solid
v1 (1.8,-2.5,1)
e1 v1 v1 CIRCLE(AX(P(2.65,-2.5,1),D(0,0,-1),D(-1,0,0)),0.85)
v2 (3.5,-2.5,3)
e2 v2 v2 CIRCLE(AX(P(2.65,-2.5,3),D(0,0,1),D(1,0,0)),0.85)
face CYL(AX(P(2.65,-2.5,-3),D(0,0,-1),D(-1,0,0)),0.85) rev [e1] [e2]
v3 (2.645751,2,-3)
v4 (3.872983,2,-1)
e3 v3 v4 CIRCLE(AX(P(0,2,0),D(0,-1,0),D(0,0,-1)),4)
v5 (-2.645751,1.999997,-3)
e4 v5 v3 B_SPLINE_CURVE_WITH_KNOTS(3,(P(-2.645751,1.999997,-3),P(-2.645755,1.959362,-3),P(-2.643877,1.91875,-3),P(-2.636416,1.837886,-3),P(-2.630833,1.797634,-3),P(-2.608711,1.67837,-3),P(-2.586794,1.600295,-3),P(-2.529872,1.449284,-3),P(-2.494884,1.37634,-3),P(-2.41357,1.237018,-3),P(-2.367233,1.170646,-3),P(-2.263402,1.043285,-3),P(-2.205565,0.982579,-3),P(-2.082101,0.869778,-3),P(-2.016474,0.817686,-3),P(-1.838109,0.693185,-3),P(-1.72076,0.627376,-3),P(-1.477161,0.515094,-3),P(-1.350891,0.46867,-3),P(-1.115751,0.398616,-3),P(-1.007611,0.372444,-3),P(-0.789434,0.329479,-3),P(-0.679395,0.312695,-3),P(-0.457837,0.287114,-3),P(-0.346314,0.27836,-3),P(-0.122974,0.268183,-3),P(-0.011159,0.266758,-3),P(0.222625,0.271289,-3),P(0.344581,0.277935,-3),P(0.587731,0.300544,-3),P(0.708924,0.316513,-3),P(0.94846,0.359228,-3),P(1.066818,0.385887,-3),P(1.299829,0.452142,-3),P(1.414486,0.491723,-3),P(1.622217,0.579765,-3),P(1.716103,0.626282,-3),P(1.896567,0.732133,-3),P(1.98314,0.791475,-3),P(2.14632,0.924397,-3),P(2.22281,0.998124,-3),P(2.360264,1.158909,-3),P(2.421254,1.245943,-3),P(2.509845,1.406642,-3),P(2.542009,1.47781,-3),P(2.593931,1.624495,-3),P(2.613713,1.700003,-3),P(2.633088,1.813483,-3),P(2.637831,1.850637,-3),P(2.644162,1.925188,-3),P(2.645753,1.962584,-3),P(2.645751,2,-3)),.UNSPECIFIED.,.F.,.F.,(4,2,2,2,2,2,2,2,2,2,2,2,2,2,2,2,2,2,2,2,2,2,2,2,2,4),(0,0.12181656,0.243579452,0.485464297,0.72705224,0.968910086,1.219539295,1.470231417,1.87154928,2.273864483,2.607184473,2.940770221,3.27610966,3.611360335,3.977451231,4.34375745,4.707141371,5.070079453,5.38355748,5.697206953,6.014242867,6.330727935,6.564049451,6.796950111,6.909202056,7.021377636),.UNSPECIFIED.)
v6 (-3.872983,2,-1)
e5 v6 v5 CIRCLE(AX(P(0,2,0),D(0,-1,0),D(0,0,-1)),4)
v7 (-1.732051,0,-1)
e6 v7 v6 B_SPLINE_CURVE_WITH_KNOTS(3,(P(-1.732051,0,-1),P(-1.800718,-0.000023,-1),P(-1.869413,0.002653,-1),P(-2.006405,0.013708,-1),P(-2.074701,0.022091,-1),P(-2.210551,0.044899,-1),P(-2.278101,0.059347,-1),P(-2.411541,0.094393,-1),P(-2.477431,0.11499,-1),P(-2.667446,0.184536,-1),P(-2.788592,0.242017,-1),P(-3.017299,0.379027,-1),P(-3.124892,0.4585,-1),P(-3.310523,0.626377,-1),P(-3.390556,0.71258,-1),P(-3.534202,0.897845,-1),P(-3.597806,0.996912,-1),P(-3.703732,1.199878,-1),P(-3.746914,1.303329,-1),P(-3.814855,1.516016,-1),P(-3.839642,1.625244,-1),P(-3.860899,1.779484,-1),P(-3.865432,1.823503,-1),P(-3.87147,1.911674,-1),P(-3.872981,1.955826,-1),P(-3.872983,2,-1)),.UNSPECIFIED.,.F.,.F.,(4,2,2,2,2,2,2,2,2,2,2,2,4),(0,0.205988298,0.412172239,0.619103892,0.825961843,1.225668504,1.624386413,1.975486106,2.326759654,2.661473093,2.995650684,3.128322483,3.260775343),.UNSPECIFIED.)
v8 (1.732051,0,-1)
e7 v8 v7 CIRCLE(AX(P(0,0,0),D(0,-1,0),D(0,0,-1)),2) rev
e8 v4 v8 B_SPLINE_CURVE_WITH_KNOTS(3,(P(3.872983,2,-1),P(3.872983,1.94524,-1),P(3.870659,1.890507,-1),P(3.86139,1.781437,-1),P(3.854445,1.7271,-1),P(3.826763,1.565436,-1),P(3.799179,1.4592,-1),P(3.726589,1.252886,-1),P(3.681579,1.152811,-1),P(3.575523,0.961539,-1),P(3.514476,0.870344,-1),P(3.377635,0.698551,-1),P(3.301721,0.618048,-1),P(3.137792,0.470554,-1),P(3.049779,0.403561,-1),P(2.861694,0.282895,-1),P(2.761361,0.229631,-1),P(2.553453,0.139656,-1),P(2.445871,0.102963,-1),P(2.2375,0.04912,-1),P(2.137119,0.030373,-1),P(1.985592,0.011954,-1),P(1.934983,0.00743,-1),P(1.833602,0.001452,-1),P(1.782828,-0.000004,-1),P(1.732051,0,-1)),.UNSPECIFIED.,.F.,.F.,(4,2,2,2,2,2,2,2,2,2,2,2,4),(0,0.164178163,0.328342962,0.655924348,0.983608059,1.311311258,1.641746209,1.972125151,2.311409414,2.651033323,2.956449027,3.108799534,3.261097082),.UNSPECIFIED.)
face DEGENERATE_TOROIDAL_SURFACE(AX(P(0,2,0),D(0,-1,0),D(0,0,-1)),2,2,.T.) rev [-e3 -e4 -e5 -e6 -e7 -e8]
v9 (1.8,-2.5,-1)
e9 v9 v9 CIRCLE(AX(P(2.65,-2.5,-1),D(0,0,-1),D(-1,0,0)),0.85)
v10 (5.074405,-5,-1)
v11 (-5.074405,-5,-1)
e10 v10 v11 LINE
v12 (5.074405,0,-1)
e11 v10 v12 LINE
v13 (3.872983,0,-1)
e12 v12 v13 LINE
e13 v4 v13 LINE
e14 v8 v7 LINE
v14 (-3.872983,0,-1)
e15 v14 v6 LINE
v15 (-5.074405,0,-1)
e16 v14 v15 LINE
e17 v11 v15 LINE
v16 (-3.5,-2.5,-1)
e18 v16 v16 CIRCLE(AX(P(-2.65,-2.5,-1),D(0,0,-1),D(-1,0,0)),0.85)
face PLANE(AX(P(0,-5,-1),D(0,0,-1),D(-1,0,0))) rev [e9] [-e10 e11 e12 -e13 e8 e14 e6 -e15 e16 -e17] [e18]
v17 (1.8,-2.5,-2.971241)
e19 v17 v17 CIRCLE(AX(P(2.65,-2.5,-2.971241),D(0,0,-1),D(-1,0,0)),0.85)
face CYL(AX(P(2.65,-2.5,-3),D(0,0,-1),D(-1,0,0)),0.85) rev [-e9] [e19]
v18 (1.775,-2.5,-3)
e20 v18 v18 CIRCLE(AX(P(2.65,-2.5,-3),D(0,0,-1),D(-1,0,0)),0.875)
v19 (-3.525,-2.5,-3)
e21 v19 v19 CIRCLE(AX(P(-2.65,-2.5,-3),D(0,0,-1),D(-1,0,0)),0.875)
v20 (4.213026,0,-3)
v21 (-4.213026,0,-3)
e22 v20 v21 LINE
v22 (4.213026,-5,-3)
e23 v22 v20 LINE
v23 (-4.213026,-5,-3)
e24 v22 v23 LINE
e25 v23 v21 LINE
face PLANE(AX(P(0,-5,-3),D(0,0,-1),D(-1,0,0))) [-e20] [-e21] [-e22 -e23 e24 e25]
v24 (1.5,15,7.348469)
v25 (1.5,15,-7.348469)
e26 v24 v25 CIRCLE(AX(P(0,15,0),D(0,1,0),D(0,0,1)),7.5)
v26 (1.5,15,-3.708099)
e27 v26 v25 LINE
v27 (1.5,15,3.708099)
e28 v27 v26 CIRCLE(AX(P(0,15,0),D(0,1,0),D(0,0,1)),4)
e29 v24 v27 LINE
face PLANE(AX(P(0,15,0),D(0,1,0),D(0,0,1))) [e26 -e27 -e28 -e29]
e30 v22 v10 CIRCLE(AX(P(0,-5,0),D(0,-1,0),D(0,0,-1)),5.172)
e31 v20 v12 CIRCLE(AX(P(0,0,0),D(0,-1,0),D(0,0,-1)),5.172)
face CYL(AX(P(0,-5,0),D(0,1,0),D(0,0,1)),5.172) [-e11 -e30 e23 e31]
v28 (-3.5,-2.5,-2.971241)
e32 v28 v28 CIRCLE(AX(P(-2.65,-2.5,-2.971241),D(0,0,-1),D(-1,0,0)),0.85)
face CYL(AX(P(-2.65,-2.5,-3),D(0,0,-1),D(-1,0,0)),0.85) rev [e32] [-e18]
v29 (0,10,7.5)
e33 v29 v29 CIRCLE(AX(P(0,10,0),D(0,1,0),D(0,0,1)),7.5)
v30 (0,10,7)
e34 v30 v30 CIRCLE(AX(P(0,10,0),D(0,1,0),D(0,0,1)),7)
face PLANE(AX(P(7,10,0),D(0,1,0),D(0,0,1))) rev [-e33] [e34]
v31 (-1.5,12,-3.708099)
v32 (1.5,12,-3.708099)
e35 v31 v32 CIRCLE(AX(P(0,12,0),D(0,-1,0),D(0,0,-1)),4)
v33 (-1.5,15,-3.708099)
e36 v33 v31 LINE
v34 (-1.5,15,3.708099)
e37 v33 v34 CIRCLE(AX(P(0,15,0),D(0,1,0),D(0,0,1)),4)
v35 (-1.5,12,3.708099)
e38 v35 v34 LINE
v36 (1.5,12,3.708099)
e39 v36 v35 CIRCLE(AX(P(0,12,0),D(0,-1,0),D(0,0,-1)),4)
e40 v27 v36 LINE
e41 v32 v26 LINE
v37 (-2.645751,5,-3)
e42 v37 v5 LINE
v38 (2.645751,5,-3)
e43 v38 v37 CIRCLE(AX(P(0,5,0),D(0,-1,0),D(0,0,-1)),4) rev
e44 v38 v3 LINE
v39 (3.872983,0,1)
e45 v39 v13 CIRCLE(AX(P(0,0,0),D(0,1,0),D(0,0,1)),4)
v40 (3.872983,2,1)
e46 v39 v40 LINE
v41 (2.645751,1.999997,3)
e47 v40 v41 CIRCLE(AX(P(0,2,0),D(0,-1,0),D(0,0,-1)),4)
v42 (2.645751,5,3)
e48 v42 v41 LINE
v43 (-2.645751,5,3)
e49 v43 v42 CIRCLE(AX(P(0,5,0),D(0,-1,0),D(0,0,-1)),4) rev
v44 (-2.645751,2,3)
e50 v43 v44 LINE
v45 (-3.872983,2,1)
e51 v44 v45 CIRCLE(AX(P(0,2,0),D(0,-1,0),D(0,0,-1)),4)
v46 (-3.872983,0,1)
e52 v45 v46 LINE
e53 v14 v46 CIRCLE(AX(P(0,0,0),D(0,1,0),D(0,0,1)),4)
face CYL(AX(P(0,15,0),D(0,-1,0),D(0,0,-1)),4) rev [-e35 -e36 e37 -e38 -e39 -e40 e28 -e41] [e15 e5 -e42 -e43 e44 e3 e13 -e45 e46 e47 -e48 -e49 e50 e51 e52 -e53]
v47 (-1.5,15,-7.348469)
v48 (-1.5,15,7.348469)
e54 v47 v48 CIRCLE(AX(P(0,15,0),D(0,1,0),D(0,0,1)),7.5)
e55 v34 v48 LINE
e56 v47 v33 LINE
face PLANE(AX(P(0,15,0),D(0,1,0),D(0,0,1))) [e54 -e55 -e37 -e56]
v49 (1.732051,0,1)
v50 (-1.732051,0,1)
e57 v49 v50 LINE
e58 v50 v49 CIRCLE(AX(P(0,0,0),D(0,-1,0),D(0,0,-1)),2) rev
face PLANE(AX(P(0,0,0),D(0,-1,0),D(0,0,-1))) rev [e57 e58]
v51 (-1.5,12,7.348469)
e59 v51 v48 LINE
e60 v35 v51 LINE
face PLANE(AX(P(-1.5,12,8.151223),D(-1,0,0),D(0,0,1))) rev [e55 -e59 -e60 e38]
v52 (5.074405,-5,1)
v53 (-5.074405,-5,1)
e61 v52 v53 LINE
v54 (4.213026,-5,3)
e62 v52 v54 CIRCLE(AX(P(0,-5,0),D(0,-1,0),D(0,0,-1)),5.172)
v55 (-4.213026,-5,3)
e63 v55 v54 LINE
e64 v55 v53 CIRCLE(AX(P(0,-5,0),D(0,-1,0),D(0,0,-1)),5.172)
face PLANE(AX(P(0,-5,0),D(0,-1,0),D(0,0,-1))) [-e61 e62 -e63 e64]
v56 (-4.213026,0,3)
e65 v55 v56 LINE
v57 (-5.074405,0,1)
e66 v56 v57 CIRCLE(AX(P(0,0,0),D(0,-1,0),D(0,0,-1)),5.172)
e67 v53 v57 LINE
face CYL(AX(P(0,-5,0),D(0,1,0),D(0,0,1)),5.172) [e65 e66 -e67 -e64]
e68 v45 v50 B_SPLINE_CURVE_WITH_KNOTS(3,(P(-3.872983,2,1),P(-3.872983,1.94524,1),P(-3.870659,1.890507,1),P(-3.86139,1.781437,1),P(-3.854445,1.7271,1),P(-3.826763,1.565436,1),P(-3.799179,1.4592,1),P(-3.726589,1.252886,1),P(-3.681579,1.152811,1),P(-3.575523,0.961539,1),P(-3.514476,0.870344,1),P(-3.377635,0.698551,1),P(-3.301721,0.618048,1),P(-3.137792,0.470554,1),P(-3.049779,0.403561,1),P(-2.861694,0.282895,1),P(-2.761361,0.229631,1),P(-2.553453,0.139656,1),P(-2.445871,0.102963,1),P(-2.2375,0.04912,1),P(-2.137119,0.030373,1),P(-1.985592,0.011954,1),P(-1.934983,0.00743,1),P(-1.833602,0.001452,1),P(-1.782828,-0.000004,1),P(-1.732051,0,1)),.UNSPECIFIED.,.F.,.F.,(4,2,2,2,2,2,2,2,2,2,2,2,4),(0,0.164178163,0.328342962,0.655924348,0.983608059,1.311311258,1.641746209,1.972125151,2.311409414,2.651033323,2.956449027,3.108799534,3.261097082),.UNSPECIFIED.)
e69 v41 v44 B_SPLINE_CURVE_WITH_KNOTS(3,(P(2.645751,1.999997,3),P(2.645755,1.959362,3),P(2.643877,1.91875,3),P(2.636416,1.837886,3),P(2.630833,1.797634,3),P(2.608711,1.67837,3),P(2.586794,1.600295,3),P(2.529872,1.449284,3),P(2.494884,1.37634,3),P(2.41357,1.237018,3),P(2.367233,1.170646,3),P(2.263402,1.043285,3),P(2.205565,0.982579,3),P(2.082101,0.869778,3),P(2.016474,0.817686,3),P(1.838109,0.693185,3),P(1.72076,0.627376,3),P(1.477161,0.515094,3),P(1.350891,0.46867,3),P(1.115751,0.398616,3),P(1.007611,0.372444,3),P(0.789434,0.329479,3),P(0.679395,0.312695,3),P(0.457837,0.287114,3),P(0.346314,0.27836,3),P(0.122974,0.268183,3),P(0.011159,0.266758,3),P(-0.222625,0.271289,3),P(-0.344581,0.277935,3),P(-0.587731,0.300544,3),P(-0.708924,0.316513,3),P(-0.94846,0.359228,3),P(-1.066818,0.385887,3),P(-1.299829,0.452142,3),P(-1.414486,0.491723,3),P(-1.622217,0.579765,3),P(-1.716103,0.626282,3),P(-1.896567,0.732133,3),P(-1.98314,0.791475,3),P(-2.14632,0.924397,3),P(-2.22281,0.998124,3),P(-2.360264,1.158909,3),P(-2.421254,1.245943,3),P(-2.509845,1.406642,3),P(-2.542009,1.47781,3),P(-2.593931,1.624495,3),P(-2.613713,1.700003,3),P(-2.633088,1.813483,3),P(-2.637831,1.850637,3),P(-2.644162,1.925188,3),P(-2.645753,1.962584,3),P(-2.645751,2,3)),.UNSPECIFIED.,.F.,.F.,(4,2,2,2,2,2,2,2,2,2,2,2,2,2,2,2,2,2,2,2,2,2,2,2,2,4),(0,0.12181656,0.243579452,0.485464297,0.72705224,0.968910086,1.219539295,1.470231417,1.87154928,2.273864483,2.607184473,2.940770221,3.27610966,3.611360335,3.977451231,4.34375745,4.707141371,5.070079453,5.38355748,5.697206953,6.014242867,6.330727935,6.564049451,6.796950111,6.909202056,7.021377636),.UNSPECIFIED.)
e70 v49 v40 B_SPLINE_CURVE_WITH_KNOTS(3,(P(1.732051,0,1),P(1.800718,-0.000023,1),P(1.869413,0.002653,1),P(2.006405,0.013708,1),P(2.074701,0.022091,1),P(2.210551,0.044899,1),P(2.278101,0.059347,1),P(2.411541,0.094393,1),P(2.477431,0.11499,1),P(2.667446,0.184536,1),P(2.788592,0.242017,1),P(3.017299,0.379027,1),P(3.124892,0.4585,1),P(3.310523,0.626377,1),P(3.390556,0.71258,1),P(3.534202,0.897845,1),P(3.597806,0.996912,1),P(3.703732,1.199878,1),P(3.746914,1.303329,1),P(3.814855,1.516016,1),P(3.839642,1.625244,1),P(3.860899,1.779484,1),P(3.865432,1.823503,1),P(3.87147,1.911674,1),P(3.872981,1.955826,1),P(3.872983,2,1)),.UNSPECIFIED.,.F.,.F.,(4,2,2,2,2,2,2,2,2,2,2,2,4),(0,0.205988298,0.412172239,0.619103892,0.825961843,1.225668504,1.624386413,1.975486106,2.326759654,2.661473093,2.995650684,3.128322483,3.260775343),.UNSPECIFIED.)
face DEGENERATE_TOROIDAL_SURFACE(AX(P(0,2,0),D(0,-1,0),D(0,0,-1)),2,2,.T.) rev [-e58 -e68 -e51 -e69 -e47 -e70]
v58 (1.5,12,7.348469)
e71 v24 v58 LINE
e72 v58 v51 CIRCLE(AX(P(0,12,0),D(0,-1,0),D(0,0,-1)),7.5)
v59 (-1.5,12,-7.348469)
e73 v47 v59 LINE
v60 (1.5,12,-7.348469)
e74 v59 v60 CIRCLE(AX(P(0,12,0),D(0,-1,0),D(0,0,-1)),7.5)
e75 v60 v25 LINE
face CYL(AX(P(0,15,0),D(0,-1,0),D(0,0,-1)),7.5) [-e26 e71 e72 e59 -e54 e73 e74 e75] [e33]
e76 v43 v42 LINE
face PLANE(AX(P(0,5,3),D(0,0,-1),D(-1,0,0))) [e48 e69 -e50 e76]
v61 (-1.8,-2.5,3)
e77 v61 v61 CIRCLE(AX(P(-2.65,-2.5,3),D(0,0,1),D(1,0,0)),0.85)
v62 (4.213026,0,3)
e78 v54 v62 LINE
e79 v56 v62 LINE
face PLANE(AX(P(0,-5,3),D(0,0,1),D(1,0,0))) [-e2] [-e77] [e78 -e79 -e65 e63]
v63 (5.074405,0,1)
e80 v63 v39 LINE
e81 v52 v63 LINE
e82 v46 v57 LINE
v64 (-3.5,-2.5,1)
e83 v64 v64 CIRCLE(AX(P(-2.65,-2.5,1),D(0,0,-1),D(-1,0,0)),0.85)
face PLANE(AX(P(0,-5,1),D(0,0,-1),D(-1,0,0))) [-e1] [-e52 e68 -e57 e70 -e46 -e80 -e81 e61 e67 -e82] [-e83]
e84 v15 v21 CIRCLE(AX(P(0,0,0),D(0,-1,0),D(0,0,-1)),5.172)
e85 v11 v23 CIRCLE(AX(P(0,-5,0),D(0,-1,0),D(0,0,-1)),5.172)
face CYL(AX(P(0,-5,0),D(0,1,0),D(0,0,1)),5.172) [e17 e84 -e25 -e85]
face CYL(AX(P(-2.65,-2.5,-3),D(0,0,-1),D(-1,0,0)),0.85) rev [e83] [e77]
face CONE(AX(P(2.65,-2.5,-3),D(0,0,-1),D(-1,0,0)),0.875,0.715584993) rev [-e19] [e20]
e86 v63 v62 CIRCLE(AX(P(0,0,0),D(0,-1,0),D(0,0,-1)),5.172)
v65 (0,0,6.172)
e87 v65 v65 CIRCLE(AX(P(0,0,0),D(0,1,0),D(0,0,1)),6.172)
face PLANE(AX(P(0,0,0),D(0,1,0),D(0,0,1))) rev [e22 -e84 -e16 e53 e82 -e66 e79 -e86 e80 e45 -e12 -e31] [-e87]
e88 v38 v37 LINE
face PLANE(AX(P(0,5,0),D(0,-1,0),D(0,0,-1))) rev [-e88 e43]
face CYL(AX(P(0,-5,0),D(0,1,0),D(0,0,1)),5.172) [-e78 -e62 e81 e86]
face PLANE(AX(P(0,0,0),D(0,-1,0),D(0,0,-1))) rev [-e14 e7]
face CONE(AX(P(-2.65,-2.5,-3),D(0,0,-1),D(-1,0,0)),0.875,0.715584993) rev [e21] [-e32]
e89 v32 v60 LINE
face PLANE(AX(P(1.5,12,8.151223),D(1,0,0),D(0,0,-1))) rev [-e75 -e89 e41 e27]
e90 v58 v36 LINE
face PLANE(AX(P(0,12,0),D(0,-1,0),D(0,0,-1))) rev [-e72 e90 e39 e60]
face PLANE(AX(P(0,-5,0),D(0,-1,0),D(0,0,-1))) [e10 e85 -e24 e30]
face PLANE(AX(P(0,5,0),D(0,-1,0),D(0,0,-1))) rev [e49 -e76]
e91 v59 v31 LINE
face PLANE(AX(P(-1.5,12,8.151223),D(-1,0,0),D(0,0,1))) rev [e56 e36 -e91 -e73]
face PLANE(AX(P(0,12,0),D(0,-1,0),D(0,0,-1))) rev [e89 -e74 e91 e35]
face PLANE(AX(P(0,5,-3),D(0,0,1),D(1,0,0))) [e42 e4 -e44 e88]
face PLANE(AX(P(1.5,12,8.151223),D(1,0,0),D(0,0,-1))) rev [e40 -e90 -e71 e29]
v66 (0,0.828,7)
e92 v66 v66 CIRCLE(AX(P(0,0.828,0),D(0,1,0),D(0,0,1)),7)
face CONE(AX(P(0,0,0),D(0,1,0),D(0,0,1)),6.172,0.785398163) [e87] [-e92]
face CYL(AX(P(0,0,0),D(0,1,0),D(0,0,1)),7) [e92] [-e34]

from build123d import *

# Parameters (mm, degrees)
CROQUIS1_R                               = 7.5
CROQUIS1_R_2                             = 4
SALIENTE_EXTRUIR1_DEPTH                  = 15
CROQUIS2_W                               = 3
CROQUIS2_H                               = 16.302446726
CORTAR_EXTRUIR1_DEPTH                    = 3
SALIENTE_EXTRUIR2_START                  = 5
SALIENTE_EXTRUIR2_DEPTH                  = 5
TALADRO_DE_MARGEN_PARA_M1_61_D           = 1.7
TALADRO_DE_MARGEN_PARA_M1_61_CSINK_D     = 1.75
TALADRO_DE_MARGEN_PARA_M1_61_CSINK_ANGLE = 82
REDONDEO1_R                              = 2
SALIENTE_EXTRUIR3_DEPTH                  = 5


# Read off the part's stored shape, not the designer's step: M14x1.5 Roscas Standard Taladro1
with BuildPart() as part:
    # Croquis1 → Saliente-Extruir1 (new body)
    with BuildSketch(Plane(origin=(0, 0, 0), x_dir=(1, 0, 0), z_dir=(0, 1, 0))):
        with Locations(Location((0, 0, 0), (0, 0, 270))):
            Circle(CROQUIS1_R)
        with Locations(Location((0, 0, 0), (0, 0, 270))):
            Circle(CROQUIS1_R_2, mode=Mode.SUBTRACT)
    extrude(amount=SALIENTE_EXTRUIR1_DEPTH)

    # Croquis2 → Cortar-Extruir1 (cut)
    with BuildSketch(Plane(origin=(0, 15, 0), x_dir=(1, 0, 0), z_dir=(0, 1, 0))):
        Rectangle(CROQUIS2_W, CROQUIS2_H)
    extrude(amount=-CORTAR_EXTRUIR1_DEPTH, mode=Mode.SUBTRACT)

    # M14x1.5 Roscas Standard Taladro1 outline → M14x1.5 Roscas Standard Taladro1 (revolve, cut)
    with BuildSketch(Plane.XY):
        Polygon((6.172, 0), (7.5, 0), (7.5, 10), (7, 10), (7, 0.828), align=None)
    revolve(axis=Axis((0, 0, 0), (0, 1, 0)), mode=Mode.SUBTRACT)

    # Croquis4 → Saliente-Extruir2 (add)
    with BuildSketch(Plane.XZ.offset(SALIENTE_EXTRUIR2_START)):
        with BuildLine():
            ThreePointArc((2.645751311, -3), (3.409321836, -2.092014488), (3.872983346, -1))
            Line((3.872983346, -1), (-3.872983346, -1))
            ThreePointArc((-3.872983346, -1), (-3.409321836, -2.092014488), (-2.645751311, -3))
            Line((-2.645751311, -3), (2.645751311, -3))
        make_face()
        with BuildLine():
            Line((-3.872983346, 1), (3.872983346, 1))
            ThreePointArc((3.872983346, 1), (3.409321836, 2.092014488), (2.645751311, 3))
            Line((2.645751311, 3), (-2.645751311, 3))
            ThreePointArc((-2.645751311, 3), (-3.409321836, 2.092014488), (-3.872983346, 1))
        make_face()
        with BuildLine():
            Line((3.872983346, 1), (5.074404793, 1))
            ThreePointArc((5.074404793, 1), (4.750167411, 2.045847884), (4.213025516, 3))
            Line((4.213025516, 3), (2.645751311, 3))
            ThreePointArc((2.645751311, 3), (3.409321836, 2.092014488), (3.872983346, 1))
        make_face()
        with BuildLine():
            Line((-5.074404793, 1), (-3.872983346, 1))
            ThreePointArc((-3.872983346, 1), (-3.409321836, 2.092014488), (-2.645751311, 3))
            Line((-2.645751311, 3), (-4.213025516, 3))
            ThreePointArc((-4.213025516, 3), (-4.750167411, 2.045847884), (-5.074404793, 1))
        make_face()
        with BuildLine():
            ThreePointArc((4.213025516, -3), (4.750167411, -2.045847884), (5.074404793, -1))
            Line((5.074404793, -1), (3.872983346, -1))
            ThreePointArc((3.872983346, -1), (3.409321836, -2.092014488), (2.645751311, -3))
            Line((2.645751311, -3), (4.213025516, -3))
        make_face()
        with BuildLine():
            ThreePointArc((-2.645751311, -3), (-3.409321836, -2.092014488), (-3.872983346, -1))
            Line((-3.872983346, -1), (-5.074404793, -1))
            ThreePointArc((-5.074404793, -1), (-4.750167411, -2.045847884), (-4.213025516, -3))
            Line((-4.213025516, -3), (-2.645751311, -3))
        make_face()
    extrude(amount=-SALIENTE_EXTRUIR2_DEPTH)

    # Taladro de margen para M1.61 (through all)
    with Locations(Plane(origin=(0, 0, -3), x_dir=(1, 0, 0), z_dir=(0, 0, -1))):
        with Locations((2.65, 2.5), (-2.65, 2.5)):
            CounterSinkHole(TALADRO_DE_MARGEN_PARA_M1_61_D / 2, TALADRO_DE_MARGEN_PARA_M1_61_CSINK_D / 2, counter_sink_angle=TALADRO_DE_MARGEN_PARA_M1_61_CSINK_ANGLE)

    # Redondeo1
    # the kernel refuses this fillet: 2 mm, written as the material it adds along each edge
    with BuildSketch(Plane(origin=(0, 0, 0), x_dir=(0.503234651569935, 0, -0.8641498049871251), z_dir=(0.8641498049871251, 0, 0.503234651569935))) as redondeo1_piece_1_section:
        with BuildLine():
            CenterArc((4 - REDONDEO1_R, REDONDEO1_R), REDONDEO1_R, 270, 90)
            Line((4 - REDONDEO1_R, 0), (4, 0))
            Line((4, 0), (4, REDONDEO1_R))
        make_face()
    redondeo1_piece_1 = revolve(axis=Axis((0, 0, 0), (0, 1, 0)), revolution_arc=177.360579055, mode=Mode.PRIVATE)
    redondeo1_piece_1 = split(redondeo1_piece_1, bisect_by=Plane(origin=(0.549602468, 0.055077536, -1), z_dir=(0, 0, -1)), keep=Keep.TOP, mode=Mode.PRIVATE)
    redondeo1_piece_1 = split(redondeo1_piece_1, bisect_by=Plane(origin=(0.549602468, 0.055077536, -3), z_dir=(0, 0, 1)), keep=Keep.TOP, mode=Mode.PRIVATE)
    add(redondeo1_piece_1)
    with BuildSketch(Plane(origin=(0, 0, 0), x_dir=(0.503234651569935, 0, -0.8641498049871251), z_dir=(0.8641498049871251, 0, 0.503234651569935))) as redondeo1_piece_2_section:
        with BuildLine():
            CenterArc((4 - REDONDEO1_R, REDONDEO1_R), REDONDEO1_R, 270, 90)
            Line((4 - REDONDEO1_R, 0), (4, 0))
            Line((4, 0), (4, REDONDEO1_R))
        make_face()
    redondeo1_piece_2 = revolve(axis=Axis((0, 0, 0), (0, 1, 0)), revolution_arc=177.360579055, mode=Mode.PRIVATE)
    redondeo1_piece_2 = split(redondeo1_piece_2, bisect_by=Plane(origin=(-2.883008057, 0.461894683, 3), z_dir=(0, 0, -1)), keep=Keep.TOP, mode=Mode.PRIVATE)
    redondeo1_piece_2 = split(redondeo1_piece_2, bisect_by=Plane(origin=(-2.883008057, 0.461894683, 1), z_dir=(0, 0, 1)), keep=Keep.TOP, mode=Mode.PRIVATE)
    add(redondeo1_piece_2)
    with BuildSketch(Plane(origin=(0, 0, 0), x_dir=(0.5424951341174628, 0, 0.8400589440383789), z_dir=(-0.8400589440383789, 0, 0.5424951341174628))) as redondeo1_piece_3_section:
        with BuildLine():
            CenterArc((4 - REDONDEO1_R, REDONDEO1_R), REDONDEO1_R, 270, 90)
            Line((4 - REDONDEO1_R, 0), (4, 0))
            Line((4, 0), (4, REDONDEO1_R))
        make_face()
    redondeo1_piece_3 = revolve(axis=Axis((0, 0, 0), (0, 1, 0)), revolution_arc=177.360579055, mode=Mode.PRIVATE)
    redondeo1_piece_3 = split(redondeo1_piece_3, bisect_by=Plane(origin=(2.883008085, 0.461894764, 3), z_dir=(0, 0, -1)), keep=Keep.TOP, mode=Mode.PRIVATE)
    redondeo1_piece_3 = split(redondeo1_piece_3, bisect_by=Plane(origin=(2.883008085, 0.461894764, 1), z_dir=(0, 0, 1)), keep=Keep.TOP, mode=Mode.PRIVATE)
    add(redondeo1_piece_3)
    with BuildSketch(Plane(origin=(0, 0, 0), x_dir=(0.5424951341174628, 0, 0.8400589440383789), z_dir=(-0.8400589440383789, 0, 0.5424951341174628))) as redondeo1_piece_4_section:
        with BuildLine():
            CenterArc((4 - REDONDEO1_R, REDONDEO1_R), REDONDEO1_R, 270, 90)
            Line((4 - REDONDEO1_R, 0), (4, 0))
            Line((4, 0), (4, REDONDEO1_R))
        make_face()
    redondeo1_piece_4 = revolve(axis=Axis((0, 0, 0), (0, 1, 0)), revolution_arc=177.360579055, mode=Mode.PRIVATE)
    redondeo1_piece_4 = split(redondeo1_piece_4, bisect_by=Plane(origin=(3.341819362, 1.478859592, -1), z_dir=(0, 0, -1)), keep=Keep.TOP, mode=Mode.PRIVATE)
    redondeo1_piece_4 = split(redondeo1_piece_4, bisect_by=Plane(origin=(3.341819362, 1.478859592, -3), z_dir=(0, 0, 1)), keep=Keep.TOP, mode=Mode.PRIVATE)
    add(redondeo1_piece_4)
    with BuildSketch(Plane(origin=(0, 0, 0), x_dir=(-0.5032346515699374, 0, 0.8641498049871236), z_dir=(-0.8641498049871236, 0, -0.5032346515699374))) as redondeo1_piece_5_section:
        with BuildLine():
            CenterArc((4 - REDONDEO1_R, REDONDEO1_R), REDONDEO1_R, 270, 90)
            Line((4 - REDONDEO1_R, 0), (4, 0))
            Line((4, 0), (4, REDONDEO1_R))
        make_face()
    redondeo1_piece_5 = revolve(axis=Axis((0, 0, 0), (0, 1, 0)), revolution_arc=177.360579055, mode=Mode.PRIVATE)
    redondeo1_piece_5 = split(redondeo1_piece_5, bisect_by=Plane(origin=(-0.549602468, 0.055077536, 3), z_dir=(0, 0, -1)), keep=Keep.TOP, mode=Mode.PRIVATE)
    redondeo1_piece_5 = split(redondeo1_piece_5, bisect_by=Plane(origin=(-0.549602468, 0.055077536, 1), z_dir=(0, 0, 1)), keep=Keep.TOP, mode=Mode.PRIVATE)
    add(redondeo1_piece_5)
    with BuildSketch(Plane(origin=(0, 0, 0), x_dir=(-0.5032346515699374, 0, 0.8641498049871236), z_dir=(-0.8641498049871236, 0, -0.5032346515699374))) as redondeo1_piece_6_section:
        with BuildLine():
            CenterArc((4 - REDONDEO1_R, REDONDEO1_R), REDONDEO1_R, 270, 90)
            Line((4 - REDONDEO1_R, 0), (4, 0))
            Line((4, 0), (4, REDONDEO1_R))
        make_face()
    redondeo1_piece_6 = revolve(axis=Axis((0, 0, 0), (0, 1, 0)), revolution_arc=177.360579055, mode=Mode.PRIVATE)
    redondeo1_piece_6 = split(redondeo1_piece_6, bisect_by=Plane(origin=(2.883008057, 0.461894683, -1), z_dir=(0, 0, -1)), keep=Keep.TOP, mode=Mode.PRIVATE)
    redondeo1_piece_6 = split(redondeo1_piece_6, bisect_by=Plane(origin=(2.883008057, 0.461894683, -3), z_dir=(0, 0, 1)), keep=Keep.TOP, mode=Mode.PRIVATE)
    add(redondeo1_piece_6)
    with BuildSketch(Plane(origin=(0, 0, 0), x_dir=(-0.542495134117437, 0, -0.8400589440383955), z_dir=(0.8400589440383955, 0, -0.542495134117437))) as redondeo1_piece_7_section:
        with BuildLine():
            CenterArc((4 - REDONDEO1_R, REDONDEO1_R), REDONDEO1_R, 270, 90)
            Line((4 - REDONDEO1_R, 0), (4, 0))
            Line((4, 0), (4, REDONDEO1_R))
        make_face()
    redondeo1_piece_7 = revolve(axis=Axis((0, 0, 0), (0, 1, 0)), revolution_arc=177.360579055, mode=Mode.PRIVATE)
    redondeo1_piece_7 = split(redondeo1_piece_7, bisect_by=Plane(origin=(-2.883008085, 0.461894764, -1), z_dir=(0, 0, -1)), keep=Keep.TOP, mode=Mode.PRIVATE)
    redondeo1_piece_7 = split(redondeo1_piece_7, bisect_by=Plane(origin=(-2.883008085, 0.461894764, -3), z_dir=(0, 0, 1)), keep=Keep.TOP, mode=Mode.PRIVATE)
    add(redondeo1_piece_7)
    with BuildSketch(Plane(origin=(0, 0, 0), x_dir=(-0.542495134117437, 0, -0.8400589440383955), z_dir=(0.8400589440383955, 0, -0.542495134117437))) as redondeo1_piece_8_section:
        with BuildLine():
            CenterArc((4 - REDONDEO1_R, REDONDEO1_R), REDONDEO1_R, 270, 90)
            Line((4 - REDONDEO1_R, 0), (4, 0))
            Line((4, 0), (4, REDONDEO1_R))
        make_face()
    redondeo1_piece_8 = revolve(axis=Axis((0, 0, 0), (0, 1, 0)), revolution_arc=177.360579055, mode=Mode.PRIVATE)
    redondeo1_piece_8 = split(redondeo1_piece_8, bisect_by=Plane(origin=(-3.341819362, 1.478859592, 3), z_dir=(0, 0, -1)), keep=Keep.TOP, mode=Mode.PRIVATE)
    redondeo1_piece_8 = split(redondeo1_piece_8, bisect_by=Plane(origin=(-3.341819362, 1.478859592, 1), z_dir=(0, 0, 1)), keep=Keep.TOP, mode=Mode.PRIVATE)
    add(redondeo1_piece_8)

    # Croquis10 → Saliente-Extruir3 (add)
    with BuildSketch(Plane.XZ):
        with BuildLine():
            ThreePointArc((2.645751311, 3), (0, 4), (-2.645751311, 3))
            Line((-2.645751311, 3), (2.645751311, 3))
        make_face()
        with BuildLine():
            ThreePointArc((-2.645751311, -3), (0, -4), (2.645751311, -3))
            Line((2.645751311, -3), (-2.645751311, -3))
        make_face()
    extrude(amount=-SALIENTE_EXTRUIR3_DEPTH)


solid = part.part
